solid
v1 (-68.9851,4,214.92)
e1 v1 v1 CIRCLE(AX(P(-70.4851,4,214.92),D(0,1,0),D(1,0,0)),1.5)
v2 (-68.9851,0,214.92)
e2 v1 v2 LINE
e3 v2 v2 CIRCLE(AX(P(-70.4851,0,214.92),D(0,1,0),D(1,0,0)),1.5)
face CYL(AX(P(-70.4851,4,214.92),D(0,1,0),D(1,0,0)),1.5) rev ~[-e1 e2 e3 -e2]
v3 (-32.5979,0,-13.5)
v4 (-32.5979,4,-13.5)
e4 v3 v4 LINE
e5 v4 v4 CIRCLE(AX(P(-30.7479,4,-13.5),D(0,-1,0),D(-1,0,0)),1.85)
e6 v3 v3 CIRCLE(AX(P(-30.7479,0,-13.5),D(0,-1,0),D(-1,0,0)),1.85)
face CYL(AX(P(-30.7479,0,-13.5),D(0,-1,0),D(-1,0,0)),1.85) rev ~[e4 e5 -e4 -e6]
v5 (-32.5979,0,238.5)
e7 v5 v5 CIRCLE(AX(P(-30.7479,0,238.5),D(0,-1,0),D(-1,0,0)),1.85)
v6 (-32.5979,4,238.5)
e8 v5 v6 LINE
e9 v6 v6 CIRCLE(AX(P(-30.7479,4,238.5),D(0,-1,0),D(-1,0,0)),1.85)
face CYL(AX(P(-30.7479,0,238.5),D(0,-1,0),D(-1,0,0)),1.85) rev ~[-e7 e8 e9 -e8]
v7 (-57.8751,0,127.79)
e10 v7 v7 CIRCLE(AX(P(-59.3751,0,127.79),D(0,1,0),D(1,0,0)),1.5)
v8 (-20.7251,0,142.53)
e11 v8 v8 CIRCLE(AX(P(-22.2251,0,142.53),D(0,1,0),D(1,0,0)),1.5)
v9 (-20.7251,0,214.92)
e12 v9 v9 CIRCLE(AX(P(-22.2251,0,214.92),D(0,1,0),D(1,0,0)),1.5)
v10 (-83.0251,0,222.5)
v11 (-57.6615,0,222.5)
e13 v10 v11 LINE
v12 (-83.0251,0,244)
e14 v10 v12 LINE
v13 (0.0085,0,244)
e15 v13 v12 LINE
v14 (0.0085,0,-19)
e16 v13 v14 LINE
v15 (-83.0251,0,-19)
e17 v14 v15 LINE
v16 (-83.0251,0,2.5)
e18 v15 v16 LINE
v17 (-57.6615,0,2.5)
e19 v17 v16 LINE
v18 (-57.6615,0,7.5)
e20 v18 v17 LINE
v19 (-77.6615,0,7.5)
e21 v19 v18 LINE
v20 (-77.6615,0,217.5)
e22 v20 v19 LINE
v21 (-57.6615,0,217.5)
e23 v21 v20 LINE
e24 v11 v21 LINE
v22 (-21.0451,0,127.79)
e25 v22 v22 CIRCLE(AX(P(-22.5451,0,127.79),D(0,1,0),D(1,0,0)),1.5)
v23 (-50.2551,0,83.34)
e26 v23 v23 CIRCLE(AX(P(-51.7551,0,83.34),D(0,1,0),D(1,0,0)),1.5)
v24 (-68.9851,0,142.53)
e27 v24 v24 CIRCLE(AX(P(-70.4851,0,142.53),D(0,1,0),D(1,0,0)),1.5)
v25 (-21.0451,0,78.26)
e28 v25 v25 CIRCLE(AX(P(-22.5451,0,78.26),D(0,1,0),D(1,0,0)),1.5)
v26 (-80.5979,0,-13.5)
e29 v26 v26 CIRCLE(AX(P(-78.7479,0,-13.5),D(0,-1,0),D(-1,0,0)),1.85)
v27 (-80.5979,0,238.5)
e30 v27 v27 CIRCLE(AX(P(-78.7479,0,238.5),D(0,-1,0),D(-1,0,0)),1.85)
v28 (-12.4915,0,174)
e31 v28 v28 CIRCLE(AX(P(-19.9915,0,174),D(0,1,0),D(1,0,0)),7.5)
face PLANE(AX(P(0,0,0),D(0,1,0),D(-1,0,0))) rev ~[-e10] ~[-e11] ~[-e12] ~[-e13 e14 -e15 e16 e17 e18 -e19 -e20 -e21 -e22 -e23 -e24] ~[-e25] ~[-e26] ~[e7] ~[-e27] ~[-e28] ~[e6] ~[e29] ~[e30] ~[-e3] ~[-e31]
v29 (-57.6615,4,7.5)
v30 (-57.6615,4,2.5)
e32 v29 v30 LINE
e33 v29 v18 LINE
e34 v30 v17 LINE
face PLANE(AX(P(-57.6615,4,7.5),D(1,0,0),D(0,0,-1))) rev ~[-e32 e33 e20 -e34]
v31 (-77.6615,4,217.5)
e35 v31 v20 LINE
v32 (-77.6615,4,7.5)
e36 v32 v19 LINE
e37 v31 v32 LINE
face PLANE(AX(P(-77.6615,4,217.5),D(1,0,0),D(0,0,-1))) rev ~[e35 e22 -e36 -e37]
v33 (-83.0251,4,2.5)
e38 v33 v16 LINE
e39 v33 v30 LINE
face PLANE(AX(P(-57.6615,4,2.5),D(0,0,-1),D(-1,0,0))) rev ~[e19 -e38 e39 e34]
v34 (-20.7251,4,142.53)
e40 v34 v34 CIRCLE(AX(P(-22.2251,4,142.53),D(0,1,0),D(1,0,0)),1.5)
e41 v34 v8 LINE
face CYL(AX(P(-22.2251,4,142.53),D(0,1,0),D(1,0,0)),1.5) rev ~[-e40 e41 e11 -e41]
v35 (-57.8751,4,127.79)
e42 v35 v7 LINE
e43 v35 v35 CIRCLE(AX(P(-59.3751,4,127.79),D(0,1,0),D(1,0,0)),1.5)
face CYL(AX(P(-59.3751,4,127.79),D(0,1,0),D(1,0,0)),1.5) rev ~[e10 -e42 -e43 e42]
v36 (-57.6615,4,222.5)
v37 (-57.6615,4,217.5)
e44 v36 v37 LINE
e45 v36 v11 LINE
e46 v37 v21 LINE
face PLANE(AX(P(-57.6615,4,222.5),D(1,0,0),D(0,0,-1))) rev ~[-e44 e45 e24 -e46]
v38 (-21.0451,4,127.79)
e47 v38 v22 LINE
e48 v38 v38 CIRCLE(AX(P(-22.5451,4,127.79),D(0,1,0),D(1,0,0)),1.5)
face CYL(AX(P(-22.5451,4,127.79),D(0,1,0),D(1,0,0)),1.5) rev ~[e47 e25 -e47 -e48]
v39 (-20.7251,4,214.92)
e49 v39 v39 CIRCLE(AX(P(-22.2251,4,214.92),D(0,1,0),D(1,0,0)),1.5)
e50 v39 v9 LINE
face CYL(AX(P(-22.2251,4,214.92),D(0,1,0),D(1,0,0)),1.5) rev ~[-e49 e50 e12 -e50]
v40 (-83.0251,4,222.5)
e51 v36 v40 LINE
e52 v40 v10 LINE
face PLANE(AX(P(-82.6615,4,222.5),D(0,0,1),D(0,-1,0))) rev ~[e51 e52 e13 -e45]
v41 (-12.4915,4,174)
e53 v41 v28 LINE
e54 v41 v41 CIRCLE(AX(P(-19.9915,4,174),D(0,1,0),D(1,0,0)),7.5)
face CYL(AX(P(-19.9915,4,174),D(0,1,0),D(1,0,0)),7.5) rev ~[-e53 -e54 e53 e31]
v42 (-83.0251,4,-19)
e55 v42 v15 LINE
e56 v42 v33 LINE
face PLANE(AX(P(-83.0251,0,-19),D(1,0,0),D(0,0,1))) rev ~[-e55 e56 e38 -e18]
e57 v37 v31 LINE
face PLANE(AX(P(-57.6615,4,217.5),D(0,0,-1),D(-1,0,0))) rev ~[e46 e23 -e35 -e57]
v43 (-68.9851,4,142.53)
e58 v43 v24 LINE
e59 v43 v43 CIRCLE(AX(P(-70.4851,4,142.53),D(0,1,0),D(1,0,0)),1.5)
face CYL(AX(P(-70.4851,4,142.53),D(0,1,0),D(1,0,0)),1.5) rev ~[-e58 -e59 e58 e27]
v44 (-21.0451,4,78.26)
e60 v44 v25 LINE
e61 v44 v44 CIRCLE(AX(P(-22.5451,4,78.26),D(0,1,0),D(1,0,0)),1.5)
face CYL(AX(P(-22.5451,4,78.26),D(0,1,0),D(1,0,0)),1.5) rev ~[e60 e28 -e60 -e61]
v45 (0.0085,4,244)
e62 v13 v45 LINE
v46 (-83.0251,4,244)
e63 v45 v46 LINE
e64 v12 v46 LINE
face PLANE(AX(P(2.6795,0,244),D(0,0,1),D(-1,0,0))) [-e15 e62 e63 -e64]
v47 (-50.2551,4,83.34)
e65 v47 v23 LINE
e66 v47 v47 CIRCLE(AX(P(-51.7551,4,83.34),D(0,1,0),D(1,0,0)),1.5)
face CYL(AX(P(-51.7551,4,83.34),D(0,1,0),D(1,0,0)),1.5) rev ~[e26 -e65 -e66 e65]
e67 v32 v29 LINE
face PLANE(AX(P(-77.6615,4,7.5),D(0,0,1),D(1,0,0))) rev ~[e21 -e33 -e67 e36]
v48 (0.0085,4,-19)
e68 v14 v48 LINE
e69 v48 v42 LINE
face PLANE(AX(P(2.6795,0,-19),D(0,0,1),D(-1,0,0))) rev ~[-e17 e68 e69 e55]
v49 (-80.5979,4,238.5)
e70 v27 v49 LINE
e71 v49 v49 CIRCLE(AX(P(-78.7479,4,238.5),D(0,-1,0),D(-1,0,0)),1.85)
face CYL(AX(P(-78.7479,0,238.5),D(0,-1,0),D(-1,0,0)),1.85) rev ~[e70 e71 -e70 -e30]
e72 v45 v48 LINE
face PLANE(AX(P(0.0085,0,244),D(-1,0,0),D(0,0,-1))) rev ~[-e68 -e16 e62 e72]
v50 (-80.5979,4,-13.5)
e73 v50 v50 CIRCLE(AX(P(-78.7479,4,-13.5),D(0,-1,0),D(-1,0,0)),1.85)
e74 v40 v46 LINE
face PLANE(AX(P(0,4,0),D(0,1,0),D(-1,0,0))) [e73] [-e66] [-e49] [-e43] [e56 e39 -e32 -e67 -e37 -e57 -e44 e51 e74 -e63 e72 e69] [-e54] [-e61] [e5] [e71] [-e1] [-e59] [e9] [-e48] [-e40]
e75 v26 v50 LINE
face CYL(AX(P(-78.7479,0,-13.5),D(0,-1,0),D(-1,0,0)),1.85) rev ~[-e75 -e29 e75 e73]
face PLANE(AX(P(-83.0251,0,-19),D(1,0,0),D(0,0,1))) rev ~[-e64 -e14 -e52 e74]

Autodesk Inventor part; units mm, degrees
ref_plane "YZ Plane" through (0, 0, 0) normal (1, 0, 0) x (0, 1, 0)
ref_plane "XZ Plane" through (0, 0, 0) normal (0, 1, 0) x (-1, 0, 0)
ref_plane "XY Plane" through (0, 0, 0) normal (0, 0, 1) x (1, 0, 0)
sketch "Эскиз1" plane through (0, 0, 0) normal (0, 1, 0) x (-1, 0, 0)
  line L0 (-2.6795, -19) -> (83.0251, -19)
  line L1 (-2.6795, 244) -> (83.0251, 244)
  circle A0 centre (30.7479, 238.5) radius 1.85
  circle A1 centre (78.7479, 238.5) radius 1.85
  circle A2 centre (78.7479, -13.5) radius 1.85
  circle A3 centre (30.7479, -13.5) radius 1.85
  line L2 (83.0251, 244) -> (-2.6795, 244)
  line L3 (-2.6795, 244) -> (-2.6795, -19)
  line L4 (-2.6795, -19) -> (83.0251, -19)
  line L5 (83.0251, -19) -> (83.0251, 244)
  point P0 (0, 0)
  point P1 (83.0251, -19)
  point P2 (-2.6795, 244)
  dimension "d7" = 5.5
  dimension "d8" = 5.5
  dimension "d9" = 4.2772
  dimension "d10" = 48
  dimension "d11" = 263
  dimension "d12" = 5.5
  dimension "d13" = 5.5
  dimension "d14" = 4.2772
  dimension "d15" = 48
extrude "Выдавливание1" add sketch "Эскиз1" along normal blind 4
thicken "Толщина1" operation add thickness 2.671 both sides no extend neighbours yes toward (-1, 0, 0) faces at (2.6795, 1.3333, 156.3333)
sketch "Эскиз2" plane through (-1.399, 4, 60) normal (0, 1, 0) x (1, 0, 0)
  line L0 (-76.2625, -157.5) -> (-76.2625, 52.5)
  line L1 (-76.2625, 52.5) -> (-56.2625, 52.5)
  line L2 (-56.2625, -157.5) -> (-76.2625, -157.5)
  line L3 (-56.2625, 57.5) -> (-76.2625, 57.5)
  line L4 (-76.2625, 57.5) -> (-81.2625, 57.5)
  line L5 (-81.2625, 57.5) -> (-81.2625, -162.5)
  line L6 (-81.2625, -162.5) -> (-76.2625, -162.5)
  line L7 (-76.2625, -162.5) -> (-56.2625, -162.5)
  line L8 (-56.2625, -162.5) -> (-56.2625, -157.5)
  line L9 (-56.2625, 52.5) -> (-56.2625, 57.5)
  line L10 (1.4075, -184) -> (1.4075, 79) projected
  point P0 (0, 0)
  dimension "d21" = 57.67
  dimension "d22" = 25
  dimension "d23" = 5
extrude "Выдавливание2" cut sketch "Эскиз2" against normal blind 10
thicken "Толщина2" operation add thickness 2 both sides no extend neighbours yes toward (-1, 0, 0) faces at (-82.6615, 2.6667, 75.8333)
sketch "Эскиз3" plane through (0, 4, 0) normal (0, 1, 0) x (1, 0, 0)
  circle A0 centre (-51.7551, -83.34) radius 1.5 projected
  circle A1 centre (-22.5451, -78.26) radius 1.5 projected
  circle A2 centre (-22.5451, -127.79) radius 1.5 projected
  circle A3 centre (-59.3751, -127.79) radius 1.5 projected
  circle A4 centre (-22.2251, -142.53) radius 1.5 projected
  circle A5 centre (-70.4851, -142.53) radius 1.5 projected
  circle A6 centre (-22.2251, -214.92) radius 1.5 projected
  circle A7 centre (-70.4851, -214.92) radius 1.5 projected
  point P0 (0, 0)
extrude "Выдавливание3" cut sketch "Эскиз3" against normal blind 10
sketch "Эскиз4" plane through (0, 4, 0) normal (0, 1, 0) x (1, 0, 0)
  circle A0 centre (-19.9915, -174) radius 7.5
  line L0 (-83.0251, -244) -> (0.0085, -244) projected
  line L1 (0.0085, -244) -> (0.0085, 19) projected
  point P0 (0, 0)
  dimension "d26" = 15
  dimension "d27" = 70
  dimension "d28" = 20
extrude "Выдавливание4" cut sketch "Эскиз4" against normal blind 10
sketch "Эскиз5" plane through (0, 4, 0) normal (0, 1, 0) x (1, 0, 0)
  line L0 (-57.6615, -7.5) -> (-77.6615, -7.5) projected
  line L1 (-83.0251, -2.5) -> (-57.6615, -2.5) projected
  point P0 (0, 0)
  dimension "d31" = 5
properties part number "KB33-046-004-002 - Передняя пластина" material "Дерево (вишня)"
